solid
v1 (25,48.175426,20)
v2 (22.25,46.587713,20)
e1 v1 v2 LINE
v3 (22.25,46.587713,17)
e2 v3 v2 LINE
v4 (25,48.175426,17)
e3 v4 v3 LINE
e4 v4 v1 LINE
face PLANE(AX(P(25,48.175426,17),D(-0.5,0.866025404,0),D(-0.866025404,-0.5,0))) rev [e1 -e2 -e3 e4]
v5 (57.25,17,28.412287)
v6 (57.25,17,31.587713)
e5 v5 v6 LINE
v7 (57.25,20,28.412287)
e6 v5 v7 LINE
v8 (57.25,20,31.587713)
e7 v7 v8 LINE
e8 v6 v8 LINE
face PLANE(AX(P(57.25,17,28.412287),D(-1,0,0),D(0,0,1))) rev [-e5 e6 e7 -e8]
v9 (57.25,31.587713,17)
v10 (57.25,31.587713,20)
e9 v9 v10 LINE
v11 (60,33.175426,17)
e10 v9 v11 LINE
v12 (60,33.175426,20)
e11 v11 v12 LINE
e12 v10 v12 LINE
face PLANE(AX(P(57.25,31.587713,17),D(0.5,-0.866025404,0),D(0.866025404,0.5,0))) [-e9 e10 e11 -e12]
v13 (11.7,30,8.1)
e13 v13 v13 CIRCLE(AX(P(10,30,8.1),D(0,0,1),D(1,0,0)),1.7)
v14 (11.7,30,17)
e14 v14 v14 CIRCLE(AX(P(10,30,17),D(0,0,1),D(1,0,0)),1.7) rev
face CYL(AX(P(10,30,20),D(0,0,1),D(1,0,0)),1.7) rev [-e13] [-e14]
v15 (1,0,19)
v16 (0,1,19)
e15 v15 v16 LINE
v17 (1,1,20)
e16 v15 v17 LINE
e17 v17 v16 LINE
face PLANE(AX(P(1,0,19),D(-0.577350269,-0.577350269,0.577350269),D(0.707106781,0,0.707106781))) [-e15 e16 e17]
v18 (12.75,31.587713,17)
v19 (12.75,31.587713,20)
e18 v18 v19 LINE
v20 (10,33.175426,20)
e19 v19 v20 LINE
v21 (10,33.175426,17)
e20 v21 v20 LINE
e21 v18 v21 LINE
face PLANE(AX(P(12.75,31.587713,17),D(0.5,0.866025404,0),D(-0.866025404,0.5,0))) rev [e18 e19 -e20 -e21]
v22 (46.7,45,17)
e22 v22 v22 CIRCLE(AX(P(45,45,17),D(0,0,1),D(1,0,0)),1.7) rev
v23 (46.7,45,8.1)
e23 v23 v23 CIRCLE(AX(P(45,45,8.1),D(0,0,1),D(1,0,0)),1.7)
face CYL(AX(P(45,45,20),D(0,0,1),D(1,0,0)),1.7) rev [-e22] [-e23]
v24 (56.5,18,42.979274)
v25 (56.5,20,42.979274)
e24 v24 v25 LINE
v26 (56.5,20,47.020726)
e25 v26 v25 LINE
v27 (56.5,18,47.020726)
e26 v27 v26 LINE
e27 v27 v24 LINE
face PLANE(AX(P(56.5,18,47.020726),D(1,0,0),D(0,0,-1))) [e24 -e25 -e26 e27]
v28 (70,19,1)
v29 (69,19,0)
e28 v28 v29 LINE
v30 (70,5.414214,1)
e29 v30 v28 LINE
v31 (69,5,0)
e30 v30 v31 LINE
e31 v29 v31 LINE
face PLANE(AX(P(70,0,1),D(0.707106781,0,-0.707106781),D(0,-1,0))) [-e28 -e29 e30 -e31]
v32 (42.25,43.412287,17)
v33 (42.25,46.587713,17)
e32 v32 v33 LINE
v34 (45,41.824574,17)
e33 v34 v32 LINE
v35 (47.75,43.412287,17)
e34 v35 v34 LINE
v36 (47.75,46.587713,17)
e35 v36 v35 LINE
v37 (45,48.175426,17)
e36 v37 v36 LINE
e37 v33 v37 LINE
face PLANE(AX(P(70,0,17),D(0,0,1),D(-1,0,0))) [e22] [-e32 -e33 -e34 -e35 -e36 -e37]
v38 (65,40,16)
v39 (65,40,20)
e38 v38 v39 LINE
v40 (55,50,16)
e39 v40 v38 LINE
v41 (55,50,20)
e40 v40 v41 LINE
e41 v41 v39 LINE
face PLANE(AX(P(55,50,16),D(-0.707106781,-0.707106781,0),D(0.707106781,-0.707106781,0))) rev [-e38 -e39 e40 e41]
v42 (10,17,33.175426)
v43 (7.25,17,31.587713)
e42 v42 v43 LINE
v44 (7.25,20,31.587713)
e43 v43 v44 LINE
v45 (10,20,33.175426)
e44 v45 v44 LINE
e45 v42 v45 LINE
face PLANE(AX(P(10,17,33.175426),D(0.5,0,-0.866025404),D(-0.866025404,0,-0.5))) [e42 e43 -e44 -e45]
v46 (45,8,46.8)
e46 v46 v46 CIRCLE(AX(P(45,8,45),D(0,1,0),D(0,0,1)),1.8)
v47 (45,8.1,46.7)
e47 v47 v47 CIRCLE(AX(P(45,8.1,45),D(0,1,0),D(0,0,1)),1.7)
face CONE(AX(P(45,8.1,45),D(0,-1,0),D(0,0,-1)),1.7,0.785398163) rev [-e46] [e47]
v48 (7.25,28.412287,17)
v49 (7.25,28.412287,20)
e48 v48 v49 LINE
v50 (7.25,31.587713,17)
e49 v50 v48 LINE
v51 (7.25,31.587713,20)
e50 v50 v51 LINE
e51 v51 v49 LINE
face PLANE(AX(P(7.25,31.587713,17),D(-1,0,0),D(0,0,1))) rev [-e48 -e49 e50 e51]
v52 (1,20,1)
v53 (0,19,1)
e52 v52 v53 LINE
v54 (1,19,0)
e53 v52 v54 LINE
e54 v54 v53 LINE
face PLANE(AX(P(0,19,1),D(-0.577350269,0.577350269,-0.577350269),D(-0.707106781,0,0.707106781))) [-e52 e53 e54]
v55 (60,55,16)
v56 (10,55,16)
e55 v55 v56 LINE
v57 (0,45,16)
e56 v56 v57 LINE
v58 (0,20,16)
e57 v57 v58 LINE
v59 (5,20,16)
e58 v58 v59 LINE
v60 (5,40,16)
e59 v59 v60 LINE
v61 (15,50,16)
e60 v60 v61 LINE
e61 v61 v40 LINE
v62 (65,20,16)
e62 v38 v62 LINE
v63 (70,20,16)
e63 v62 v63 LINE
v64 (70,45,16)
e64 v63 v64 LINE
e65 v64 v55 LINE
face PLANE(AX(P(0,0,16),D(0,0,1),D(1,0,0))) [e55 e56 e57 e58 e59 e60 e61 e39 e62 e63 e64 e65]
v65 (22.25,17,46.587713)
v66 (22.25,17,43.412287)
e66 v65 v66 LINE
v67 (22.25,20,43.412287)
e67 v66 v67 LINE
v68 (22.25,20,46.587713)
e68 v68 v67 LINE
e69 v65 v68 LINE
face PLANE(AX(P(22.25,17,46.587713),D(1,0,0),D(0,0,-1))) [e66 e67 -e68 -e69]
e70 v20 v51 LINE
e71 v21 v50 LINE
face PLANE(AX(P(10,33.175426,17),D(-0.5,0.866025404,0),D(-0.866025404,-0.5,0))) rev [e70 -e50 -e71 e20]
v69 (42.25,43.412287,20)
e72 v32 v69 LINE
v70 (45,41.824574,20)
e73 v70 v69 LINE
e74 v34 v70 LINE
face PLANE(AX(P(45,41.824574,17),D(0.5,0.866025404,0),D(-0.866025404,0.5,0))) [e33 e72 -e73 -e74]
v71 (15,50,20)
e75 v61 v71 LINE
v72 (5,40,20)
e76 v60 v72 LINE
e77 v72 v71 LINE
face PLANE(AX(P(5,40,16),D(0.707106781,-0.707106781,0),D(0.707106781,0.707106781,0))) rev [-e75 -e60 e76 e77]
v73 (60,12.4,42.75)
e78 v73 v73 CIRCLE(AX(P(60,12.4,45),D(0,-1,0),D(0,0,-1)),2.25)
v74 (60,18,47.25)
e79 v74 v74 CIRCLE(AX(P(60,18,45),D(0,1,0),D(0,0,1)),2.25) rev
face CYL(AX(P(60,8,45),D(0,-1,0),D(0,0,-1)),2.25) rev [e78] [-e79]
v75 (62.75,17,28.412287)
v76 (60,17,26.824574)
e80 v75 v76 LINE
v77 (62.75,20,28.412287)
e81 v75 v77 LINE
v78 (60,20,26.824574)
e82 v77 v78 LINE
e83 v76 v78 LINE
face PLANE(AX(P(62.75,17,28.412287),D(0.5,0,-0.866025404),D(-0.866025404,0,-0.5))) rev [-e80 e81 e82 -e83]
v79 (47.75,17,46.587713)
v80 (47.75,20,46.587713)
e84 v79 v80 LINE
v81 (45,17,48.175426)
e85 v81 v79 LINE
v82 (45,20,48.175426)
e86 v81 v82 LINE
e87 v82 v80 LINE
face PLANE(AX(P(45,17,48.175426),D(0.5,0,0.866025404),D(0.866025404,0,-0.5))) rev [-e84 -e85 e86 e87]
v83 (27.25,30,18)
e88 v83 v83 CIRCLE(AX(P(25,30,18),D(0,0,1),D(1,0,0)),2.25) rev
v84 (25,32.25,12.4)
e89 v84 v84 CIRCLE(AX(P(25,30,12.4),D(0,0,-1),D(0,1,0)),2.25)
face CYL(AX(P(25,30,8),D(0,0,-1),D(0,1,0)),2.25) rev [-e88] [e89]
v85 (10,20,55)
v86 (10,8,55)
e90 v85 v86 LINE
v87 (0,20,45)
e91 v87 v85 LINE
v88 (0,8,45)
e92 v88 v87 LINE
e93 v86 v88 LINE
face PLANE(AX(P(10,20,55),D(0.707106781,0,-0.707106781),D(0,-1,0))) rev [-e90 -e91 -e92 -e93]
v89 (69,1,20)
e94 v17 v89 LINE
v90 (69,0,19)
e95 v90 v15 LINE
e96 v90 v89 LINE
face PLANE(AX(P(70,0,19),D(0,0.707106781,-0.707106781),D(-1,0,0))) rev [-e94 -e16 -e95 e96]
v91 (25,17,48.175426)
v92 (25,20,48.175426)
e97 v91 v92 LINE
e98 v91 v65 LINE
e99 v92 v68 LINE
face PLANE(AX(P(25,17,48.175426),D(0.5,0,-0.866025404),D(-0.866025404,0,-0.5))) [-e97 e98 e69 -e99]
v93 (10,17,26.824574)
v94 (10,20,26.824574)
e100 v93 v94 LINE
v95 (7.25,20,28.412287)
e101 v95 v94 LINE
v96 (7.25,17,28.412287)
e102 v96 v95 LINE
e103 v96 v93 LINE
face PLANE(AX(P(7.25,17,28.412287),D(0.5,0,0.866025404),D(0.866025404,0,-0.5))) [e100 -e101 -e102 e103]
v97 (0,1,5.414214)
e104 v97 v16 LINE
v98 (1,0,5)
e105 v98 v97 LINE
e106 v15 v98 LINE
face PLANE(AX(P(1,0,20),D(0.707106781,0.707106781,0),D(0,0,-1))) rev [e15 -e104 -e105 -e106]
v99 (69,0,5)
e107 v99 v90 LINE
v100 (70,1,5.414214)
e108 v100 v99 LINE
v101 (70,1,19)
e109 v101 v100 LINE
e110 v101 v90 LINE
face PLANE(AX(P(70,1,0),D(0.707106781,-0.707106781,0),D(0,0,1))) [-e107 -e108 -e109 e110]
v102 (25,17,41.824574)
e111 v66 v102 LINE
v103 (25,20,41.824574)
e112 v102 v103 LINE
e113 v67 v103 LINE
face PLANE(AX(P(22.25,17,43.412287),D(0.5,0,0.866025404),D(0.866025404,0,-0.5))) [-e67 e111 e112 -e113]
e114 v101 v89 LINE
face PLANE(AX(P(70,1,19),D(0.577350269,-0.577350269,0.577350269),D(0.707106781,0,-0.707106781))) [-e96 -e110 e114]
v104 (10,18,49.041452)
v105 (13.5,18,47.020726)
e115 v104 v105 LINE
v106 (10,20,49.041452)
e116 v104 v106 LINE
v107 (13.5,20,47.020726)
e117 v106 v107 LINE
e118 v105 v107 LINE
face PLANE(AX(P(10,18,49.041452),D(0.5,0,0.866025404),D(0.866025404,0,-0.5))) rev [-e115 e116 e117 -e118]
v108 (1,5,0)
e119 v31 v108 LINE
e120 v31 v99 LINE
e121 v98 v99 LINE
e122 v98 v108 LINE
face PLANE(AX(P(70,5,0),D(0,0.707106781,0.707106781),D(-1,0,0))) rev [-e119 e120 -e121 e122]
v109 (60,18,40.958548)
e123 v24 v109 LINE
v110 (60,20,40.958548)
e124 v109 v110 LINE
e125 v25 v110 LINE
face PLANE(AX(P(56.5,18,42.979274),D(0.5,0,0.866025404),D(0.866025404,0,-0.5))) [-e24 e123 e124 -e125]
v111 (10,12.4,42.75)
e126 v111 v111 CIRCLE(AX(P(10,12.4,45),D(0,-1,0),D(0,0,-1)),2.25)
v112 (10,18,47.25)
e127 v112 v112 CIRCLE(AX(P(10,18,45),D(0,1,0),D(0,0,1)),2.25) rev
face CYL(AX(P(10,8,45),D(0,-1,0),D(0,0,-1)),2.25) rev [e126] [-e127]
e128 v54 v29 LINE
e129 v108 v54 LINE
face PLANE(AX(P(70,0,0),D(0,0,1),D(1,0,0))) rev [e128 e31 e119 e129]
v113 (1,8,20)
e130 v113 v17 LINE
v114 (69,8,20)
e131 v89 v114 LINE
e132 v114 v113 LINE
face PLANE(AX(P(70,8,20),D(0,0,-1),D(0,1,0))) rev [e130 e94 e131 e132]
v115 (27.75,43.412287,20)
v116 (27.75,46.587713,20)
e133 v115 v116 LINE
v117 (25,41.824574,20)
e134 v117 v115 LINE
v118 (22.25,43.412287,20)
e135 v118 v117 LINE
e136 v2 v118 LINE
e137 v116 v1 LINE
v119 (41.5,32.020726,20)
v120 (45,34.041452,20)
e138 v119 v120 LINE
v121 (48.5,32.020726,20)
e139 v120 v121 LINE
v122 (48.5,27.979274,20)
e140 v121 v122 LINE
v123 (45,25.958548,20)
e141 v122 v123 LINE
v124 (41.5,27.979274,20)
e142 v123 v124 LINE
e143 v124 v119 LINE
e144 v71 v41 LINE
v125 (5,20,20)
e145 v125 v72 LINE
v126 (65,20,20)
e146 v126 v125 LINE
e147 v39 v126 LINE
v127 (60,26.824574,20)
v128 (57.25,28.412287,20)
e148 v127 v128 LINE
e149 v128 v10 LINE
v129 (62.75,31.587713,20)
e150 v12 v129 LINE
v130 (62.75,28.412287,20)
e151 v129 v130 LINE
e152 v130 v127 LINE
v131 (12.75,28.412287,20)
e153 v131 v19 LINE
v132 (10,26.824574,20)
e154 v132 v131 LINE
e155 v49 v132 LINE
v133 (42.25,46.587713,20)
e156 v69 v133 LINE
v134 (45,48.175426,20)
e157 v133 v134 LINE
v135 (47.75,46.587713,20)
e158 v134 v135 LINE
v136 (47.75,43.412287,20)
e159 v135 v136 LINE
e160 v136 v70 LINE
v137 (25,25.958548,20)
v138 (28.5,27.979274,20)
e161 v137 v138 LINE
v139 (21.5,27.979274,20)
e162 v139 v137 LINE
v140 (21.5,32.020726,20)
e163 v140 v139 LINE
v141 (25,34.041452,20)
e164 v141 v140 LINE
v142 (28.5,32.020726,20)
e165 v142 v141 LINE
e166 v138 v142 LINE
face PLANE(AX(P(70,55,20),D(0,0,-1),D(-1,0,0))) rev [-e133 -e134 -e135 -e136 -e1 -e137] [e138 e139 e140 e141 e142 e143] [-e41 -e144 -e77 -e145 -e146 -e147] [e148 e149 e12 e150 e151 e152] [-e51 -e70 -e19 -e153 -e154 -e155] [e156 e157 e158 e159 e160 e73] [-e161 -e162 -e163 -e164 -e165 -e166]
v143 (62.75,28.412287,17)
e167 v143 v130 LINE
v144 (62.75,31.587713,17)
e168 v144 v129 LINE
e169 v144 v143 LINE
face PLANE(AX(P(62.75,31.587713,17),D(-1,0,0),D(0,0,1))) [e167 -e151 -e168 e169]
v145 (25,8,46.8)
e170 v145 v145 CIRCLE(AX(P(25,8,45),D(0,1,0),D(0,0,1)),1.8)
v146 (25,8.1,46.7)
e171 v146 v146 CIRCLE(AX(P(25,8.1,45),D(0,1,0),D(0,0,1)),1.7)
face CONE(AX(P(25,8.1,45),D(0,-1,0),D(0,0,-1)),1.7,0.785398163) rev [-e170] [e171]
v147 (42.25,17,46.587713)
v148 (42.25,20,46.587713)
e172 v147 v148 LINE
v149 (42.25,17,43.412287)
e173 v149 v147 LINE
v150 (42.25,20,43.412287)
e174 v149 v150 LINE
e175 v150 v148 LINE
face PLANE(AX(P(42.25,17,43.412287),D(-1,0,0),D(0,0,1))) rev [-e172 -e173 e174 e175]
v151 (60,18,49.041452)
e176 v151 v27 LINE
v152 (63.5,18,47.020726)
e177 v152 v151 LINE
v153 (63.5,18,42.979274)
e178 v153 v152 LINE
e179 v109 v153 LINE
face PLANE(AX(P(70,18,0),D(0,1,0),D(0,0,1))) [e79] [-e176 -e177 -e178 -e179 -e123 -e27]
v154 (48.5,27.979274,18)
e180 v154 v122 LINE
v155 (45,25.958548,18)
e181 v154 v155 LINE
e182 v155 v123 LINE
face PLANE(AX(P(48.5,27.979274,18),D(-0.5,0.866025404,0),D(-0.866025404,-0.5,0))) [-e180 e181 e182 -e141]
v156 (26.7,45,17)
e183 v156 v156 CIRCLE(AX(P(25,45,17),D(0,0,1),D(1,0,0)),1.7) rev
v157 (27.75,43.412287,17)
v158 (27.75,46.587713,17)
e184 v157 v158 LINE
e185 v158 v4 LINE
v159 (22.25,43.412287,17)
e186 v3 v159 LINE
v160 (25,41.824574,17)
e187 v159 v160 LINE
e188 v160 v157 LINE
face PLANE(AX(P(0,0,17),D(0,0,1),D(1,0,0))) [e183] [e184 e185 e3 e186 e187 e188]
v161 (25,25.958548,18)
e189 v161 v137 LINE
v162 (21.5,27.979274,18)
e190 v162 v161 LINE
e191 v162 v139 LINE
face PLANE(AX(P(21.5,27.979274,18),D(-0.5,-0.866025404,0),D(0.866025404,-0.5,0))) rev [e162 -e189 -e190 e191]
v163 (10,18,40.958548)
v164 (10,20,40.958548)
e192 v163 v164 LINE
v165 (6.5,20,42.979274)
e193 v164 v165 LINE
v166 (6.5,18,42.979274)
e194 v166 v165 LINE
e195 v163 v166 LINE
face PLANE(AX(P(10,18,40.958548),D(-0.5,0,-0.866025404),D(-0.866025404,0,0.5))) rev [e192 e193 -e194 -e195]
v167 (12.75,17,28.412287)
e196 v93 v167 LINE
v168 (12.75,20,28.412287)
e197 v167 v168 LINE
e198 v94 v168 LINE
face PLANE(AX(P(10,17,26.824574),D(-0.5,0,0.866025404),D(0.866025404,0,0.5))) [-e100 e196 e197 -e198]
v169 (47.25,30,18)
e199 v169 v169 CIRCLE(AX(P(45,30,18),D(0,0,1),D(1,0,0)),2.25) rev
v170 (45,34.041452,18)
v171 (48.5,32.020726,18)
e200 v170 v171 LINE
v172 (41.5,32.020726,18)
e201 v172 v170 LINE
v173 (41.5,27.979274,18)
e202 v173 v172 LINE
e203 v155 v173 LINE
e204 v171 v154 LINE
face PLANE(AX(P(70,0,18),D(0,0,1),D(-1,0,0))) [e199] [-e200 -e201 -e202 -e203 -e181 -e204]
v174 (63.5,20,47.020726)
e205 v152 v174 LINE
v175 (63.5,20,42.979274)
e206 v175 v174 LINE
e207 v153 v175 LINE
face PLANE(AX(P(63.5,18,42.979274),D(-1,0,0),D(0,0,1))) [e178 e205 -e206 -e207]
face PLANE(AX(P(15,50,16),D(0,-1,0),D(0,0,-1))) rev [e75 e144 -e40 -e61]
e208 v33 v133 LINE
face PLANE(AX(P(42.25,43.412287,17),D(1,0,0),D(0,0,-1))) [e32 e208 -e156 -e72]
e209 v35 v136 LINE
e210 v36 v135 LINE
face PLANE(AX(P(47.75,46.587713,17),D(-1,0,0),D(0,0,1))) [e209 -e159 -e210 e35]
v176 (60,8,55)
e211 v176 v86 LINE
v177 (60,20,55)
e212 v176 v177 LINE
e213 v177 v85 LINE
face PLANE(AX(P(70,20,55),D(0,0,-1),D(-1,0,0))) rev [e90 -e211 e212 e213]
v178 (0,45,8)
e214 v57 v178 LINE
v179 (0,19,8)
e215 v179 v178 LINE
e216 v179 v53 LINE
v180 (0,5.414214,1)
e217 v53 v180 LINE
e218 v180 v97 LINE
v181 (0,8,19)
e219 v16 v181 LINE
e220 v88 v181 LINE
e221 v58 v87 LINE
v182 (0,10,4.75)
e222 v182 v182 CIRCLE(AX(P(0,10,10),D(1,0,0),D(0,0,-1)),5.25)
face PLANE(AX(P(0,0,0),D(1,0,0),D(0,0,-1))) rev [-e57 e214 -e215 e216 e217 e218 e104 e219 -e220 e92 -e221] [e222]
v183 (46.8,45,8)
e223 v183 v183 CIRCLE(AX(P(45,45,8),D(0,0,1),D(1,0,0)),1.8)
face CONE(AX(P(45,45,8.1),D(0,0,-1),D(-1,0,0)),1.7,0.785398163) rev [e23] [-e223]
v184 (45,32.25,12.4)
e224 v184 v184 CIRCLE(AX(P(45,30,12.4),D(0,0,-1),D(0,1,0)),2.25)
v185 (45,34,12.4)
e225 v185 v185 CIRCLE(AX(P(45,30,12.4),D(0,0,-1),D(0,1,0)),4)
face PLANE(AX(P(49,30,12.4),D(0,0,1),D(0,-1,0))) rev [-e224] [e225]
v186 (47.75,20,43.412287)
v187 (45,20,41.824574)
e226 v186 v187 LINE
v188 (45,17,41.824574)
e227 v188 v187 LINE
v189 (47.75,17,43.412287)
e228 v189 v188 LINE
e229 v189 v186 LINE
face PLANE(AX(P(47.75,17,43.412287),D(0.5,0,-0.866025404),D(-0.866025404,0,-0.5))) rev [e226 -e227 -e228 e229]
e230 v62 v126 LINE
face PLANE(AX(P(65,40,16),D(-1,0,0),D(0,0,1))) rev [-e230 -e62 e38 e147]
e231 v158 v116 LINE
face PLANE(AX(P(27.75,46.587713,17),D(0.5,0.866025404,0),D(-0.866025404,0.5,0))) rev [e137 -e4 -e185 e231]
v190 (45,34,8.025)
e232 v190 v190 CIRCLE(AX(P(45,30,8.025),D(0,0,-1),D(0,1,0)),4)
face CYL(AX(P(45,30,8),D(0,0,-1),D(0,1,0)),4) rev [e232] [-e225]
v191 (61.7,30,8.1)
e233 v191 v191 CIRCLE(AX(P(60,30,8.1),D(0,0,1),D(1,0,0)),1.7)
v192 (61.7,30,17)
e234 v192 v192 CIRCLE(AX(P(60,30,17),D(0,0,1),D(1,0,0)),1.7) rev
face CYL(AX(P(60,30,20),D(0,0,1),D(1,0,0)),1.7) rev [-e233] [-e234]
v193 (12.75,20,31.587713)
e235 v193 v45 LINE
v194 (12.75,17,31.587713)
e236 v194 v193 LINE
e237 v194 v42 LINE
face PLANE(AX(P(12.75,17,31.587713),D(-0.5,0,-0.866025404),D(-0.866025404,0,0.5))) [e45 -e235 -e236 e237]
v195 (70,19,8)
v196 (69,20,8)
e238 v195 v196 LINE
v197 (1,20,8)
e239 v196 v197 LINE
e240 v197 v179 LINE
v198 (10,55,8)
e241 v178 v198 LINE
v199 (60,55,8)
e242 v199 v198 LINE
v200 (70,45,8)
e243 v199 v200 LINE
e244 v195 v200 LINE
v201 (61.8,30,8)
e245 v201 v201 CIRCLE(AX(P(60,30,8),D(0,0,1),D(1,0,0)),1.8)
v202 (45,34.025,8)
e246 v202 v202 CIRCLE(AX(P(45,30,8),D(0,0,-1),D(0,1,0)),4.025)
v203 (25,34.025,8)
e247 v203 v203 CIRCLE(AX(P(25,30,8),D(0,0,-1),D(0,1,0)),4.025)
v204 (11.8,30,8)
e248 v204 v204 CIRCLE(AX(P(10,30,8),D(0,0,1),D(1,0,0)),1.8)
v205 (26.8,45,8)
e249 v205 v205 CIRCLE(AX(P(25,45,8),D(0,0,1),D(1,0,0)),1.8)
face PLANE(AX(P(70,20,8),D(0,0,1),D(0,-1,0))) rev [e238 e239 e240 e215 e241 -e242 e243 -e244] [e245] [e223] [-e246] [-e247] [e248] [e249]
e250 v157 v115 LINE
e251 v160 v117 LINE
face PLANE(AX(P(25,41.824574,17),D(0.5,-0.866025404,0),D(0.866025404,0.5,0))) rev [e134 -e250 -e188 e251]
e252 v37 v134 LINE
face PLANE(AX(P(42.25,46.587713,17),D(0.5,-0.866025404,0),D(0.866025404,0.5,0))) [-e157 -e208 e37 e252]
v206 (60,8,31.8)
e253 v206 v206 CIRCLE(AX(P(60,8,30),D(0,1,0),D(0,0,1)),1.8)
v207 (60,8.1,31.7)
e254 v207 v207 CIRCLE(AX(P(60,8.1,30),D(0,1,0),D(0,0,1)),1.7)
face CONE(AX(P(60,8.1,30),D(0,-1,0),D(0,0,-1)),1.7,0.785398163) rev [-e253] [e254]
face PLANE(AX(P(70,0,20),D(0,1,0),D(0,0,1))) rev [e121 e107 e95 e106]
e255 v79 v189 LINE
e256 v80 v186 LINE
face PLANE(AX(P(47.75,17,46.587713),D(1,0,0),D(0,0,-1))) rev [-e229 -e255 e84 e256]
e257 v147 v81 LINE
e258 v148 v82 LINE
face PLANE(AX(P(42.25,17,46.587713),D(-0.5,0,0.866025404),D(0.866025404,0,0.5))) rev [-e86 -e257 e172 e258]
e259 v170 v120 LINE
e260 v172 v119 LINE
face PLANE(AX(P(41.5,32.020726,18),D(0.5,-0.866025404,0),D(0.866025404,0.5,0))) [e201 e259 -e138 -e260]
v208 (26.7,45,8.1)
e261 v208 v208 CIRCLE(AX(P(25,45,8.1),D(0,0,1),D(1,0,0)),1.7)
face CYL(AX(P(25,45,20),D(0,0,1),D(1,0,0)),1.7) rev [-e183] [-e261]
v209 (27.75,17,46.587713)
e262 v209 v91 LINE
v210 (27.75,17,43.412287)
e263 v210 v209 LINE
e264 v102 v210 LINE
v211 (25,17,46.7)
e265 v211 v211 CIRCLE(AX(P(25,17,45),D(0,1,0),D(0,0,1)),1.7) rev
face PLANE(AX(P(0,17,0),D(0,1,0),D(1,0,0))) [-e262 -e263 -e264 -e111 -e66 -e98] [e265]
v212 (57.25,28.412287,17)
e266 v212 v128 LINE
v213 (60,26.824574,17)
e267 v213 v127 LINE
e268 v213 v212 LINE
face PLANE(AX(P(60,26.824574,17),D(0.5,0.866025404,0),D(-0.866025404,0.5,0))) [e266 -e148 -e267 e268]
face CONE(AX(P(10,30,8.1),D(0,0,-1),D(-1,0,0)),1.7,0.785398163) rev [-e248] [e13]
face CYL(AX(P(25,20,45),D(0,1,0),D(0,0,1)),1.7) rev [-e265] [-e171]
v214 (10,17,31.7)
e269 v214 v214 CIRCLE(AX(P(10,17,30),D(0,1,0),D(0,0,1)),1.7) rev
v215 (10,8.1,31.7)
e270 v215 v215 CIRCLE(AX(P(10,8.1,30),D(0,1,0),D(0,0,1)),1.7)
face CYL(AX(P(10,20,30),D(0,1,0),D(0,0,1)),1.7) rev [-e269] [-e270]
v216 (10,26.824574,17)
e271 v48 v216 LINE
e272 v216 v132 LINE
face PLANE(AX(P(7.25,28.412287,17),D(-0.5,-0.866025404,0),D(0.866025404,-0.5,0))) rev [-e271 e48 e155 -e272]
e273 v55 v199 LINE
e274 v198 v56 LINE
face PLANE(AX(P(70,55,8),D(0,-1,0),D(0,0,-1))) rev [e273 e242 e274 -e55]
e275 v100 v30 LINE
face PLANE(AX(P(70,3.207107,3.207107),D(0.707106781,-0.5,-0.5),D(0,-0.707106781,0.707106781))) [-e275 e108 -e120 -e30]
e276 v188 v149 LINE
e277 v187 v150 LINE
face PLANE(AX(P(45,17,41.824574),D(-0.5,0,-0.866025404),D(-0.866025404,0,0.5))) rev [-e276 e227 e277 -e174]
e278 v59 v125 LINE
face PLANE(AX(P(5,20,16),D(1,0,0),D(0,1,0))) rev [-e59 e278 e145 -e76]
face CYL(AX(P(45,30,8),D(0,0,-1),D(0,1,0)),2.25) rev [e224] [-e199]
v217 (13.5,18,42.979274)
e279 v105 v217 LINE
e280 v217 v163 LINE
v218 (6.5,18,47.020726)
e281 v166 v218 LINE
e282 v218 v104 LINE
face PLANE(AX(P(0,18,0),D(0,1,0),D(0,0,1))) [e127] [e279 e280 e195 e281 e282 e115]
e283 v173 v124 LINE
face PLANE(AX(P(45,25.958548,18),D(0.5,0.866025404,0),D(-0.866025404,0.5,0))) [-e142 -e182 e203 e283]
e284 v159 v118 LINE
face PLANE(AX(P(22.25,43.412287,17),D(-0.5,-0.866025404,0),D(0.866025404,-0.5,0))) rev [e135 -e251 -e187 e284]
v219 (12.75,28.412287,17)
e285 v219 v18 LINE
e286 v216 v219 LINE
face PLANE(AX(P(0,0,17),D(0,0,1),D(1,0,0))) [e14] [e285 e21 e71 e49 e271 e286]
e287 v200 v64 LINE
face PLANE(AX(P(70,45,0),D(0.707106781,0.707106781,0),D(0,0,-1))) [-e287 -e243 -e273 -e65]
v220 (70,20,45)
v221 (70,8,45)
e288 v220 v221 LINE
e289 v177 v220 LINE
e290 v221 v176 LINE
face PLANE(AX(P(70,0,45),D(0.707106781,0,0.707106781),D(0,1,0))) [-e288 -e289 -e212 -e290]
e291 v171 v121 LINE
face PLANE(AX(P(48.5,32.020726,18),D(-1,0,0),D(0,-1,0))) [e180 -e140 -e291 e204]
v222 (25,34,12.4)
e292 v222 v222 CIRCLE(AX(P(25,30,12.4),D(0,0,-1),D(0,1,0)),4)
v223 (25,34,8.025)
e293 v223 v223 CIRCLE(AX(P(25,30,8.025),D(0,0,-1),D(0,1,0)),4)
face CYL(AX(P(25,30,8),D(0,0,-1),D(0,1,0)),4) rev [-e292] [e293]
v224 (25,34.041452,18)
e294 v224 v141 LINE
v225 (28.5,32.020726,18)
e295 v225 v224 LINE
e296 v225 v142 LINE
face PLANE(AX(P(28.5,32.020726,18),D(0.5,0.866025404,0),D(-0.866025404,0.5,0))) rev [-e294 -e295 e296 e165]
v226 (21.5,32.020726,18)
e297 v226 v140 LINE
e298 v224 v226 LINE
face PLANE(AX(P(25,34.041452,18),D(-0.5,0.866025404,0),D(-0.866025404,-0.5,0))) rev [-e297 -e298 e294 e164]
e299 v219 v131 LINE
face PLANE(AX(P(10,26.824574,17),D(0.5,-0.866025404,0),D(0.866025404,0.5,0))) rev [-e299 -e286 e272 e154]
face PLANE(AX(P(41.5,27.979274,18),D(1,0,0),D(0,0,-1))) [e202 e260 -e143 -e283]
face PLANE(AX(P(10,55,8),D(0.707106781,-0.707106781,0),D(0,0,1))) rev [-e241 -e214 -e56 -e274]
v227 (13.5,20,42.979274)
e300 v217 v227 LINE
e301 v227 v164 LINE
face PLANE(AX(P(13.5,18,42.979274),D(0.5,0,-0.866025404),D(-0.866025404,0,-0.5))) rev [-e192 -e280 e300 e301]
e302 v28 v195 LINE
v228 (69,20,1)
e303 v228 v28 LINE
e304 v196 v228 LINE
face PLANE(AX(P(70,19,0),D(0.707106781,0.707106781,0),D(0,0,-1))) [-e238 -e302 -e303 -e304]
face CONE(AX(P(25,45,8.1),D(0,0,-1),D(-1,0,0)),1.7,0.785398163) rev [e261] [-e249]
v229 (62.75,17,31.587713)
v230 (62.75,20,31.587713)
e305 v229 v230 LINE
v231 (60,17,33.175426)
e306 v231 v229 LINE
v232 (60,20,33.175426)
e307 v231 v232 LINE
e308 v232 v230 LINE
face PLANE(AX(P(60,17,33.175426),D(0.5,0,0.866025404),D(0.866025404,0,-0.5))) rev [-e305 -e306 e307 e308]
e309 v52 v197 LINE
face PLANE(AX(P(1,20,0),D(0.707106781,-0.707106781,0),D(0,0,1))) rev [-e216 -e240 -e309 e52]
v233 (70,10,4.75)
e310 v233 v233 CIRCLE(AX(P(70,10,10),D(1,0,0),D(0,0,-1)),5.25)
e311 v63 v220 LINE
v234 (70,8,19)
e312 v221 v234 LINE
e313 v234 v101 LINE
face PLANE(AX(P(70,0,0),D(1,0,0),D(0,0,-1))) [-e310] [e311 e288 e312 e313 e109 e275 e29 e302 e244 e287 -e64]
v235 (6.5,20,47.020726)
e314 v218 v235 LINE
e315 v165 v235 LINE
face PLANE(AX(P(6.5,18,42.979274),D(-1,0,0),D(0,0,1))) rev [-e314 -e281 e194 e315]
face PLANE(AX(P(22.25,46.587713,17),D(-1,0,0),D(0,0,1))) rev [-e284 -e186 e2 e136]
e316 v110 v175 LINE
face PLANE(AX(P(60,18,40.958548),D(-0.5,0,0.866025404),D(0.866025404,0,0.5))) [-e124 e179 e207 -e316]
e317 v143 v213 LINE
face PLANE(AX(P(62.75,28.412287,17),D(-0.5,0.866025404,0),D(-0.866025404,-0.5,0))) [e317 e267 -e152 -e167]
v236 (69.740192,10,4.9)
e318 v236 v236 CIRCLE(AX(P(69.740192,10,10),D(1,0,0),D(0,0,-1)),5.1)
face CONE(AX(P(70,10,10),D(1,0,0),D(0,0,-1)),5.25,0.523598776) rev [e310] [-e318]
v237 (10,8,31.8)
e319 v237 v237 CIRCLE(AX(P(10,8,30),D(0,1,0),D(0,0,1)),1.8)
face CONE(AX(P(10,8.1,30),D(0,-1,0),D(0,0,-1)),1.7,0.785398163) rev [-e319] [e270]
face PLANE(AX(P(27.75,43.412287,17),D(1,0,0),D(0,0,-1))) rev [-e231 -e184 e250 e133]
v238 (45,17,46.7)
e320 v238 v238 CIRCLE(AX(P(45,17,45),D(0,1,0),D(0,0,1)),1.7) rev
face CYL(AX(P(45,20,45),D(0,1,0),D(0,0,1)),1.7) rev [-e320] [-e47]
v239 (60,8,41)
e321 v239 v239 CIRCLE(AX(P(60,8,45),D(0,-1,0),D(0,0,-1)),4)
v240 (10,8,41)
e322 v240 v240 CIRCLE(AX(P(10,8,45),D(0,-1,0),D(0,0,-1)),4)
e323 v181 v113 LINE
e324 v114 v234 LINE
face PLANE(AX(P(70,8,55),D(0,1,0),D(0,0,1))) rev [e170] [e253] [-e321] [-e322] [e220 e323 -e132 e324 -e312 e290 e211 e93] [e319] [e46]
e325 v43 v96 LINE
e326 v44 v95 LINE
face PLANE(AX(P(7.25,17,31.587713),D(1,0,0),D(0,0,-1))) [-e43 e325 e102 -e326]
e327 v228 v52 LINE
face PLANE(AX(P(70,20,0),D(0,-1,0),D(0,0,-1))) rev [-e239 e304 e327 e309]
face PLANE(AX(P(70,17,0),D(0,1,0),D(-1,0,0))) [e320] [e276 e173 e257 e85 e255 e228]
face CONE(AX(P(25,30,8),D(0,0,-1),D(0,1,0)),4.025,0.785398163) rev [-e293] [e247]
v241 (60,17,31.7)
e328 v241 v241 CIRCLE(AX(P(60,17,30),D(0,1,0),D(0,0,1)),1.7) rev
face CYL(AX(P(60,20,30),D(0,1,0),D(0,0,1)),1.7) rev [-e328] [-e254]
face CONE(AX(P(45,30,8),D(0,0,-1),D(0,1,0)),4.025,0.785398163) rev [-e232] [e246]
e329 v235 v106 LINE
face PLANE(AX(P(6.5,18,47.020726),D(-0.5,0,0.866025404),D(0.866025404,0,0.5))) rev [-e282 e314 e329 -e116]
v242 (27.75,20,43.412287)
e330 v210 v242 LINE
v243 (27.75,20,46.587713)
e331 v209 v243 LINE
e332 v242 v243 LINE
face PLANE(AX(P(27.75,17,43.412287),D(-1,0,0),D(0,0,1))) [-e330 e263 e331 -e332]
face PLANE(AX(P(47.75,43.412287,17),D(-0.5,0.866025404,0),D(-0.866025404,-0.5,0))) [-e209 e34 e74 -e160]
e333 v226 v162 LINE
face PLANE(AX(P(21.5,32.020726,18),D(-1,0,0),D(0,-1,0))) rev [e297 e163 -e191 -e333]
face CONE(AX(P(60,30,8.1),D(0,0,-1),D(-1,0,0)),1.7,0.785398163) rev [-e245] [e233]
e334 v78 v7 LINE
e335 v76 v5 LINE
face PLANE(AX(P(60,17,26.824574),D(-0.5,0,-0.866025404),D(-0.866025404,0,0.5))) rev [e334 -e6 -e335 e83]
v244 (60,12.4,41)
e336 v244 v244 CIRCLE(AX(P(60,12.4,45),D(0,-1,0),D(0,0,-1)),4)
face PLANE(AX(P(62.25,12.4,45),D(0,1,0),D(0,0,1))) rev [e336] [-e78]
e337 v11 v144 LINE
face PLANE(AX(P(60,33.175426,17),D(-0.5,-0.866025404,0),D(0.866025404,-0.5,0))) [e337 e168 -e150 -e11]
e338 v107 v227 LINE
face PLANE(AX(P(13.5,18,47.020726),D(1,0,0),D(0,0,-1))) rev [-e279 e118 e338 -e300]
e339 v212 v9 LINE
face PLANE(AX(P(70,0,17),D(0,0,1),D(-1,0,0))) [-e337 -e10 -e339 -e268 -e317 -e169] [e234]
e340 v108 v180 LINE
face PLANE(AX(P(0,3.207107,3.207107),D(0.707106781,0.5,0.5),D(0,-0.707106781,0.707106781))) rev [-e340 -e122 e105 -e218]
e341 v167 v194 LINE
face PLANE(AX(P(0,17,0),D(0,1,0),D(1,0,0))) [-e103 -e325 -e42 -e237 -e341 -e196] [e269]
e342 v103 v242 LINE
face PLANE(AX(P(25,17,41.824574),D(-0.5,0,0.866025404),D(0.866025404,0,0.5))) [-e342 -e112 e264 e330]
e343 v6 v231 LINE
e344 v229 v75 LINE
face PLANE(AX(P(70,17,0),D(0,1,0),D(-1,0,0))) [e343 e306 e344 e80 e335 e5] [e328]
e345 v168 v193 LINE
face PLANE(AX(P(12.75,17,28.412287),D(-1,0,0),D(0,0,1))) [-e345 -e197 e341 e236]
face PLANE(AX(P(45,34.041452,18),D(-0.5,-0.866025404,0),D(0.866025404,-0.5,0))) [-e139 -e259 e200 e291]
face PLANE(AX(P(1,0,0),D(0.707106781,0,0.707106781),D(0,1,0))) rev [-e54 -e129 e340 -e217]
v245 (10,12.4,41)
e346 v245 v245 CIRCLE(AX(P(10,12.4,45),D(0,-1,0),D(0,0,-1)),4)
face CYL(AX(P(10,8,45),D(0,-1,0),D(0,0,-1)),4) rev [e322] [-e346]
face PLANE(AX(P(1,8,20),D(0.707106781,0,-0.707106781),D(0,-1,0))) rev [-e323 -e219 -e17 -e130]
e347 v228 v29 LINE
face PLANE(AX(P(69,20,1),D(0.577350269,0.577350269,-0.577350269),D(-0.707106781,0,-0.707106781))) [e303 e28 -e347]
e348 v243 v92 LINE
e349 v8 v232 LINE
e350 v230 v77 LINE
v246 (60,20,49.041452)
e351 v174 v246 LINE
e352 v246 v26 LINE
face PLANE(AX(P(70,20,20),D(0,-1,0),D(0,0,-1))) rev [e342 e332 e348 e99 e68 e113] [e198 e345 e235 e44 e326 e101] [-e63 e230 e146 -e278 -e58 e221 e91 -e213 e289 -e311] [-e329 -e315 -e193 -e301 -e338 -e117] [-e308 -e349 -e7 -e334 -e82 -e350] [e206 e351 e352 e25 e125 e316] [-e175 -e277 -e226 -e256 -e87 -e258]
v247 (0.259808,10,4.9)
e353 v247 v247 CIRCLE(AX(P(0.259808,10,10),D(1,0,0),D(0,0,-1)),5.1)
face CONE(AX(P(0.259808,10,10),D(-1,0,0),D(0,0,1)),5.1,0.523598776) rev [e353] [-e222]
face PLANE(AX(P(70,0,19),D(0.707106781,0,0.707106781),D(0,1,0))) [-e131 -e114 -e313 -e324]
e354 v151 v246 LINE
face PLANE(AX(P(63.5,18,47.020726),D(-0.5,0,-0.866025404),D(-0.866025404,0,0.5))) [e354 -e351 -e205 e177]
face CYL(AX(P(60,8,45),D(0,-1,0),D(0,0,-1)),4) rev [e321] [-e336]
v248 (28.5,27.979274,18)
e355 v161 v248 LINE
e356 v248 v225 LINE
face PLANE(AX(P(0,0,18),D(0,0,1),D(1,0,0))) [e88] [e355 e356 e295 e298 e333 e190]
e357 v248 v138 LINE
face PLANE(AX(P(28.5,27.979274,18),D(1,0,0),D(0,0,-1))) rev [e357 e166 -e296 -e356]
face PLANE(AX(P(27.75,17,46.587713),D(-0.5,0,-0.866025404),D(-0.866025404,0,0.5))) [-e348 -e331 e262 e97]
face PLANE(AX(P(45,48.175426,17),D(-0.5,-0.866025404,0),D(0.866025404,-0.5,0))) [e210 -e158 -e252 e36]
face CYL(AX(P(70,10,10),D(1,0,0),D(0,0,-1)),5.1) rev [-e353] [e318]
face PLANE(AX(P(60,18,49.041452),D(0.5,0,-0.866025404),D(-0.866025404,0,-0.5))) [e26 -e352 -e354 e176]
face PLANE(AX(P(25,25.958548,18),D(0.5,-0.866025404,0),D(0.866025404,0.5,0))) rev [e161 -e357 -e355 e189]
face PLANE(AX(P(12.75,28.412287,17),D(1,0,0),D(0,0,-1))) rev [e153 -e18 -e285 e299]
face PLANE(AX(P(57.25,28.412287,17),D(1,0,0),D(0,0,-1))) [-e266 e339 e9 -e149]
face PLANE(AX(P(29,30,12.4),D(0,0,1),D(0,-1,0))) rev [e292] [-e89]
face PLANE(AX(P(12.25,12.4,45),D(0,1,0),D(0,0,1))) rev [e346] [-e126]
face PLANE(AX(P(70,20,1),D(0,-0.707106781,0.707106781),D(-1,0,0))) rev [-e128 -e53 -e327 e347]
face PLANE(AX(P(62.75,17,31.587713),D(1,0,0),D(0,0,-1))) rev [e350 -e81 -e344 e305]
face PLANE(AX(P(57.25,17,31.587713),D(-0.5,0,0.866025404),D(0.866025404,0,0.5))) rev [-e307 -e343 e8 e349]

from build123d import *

# Parameters (mm, degrees)
BODY_DEPTH                             = 70
FRONTAL_M3_NUT_CUTOUTS_DEPTH           = 3
FRONTAL_M4_NUT_CUTOUT_DEPTH            = 2
MAIN_CHAMFER_SIZE                      = 5
SIDE_CHAMFER_SIZE                      = 1
WALL_CHAMFERS_SIZE                     = 10
CLEARANCE_CUTOUT_DEPTH                 = 4
M3_FULL_MIRROR_COPY_3_DEPTH            = 3
BOTTOM_BOARD_MOUNTING_HOLE_D           = 4.5
BOTTOM_BOARD_MOUNTING_HOLE_CBORE_D     = 8
BOTTOM_BOARD_MOUNTING_HOLE_CBORE_DEPTH = 4.4
BOTTOM_M4_NUT_CUTOUT_DEPTH             = 2


# Read off the part's stored shape, not the designer's step: hull_mounting_holes
with BuildPart() as part:
    # body_sketch → body (new body)
    with BuildSketch(Plane(origin=(0, 0, 0), x_dir=(0, 0, -1), z_dir=(1, 0, 0))):
        Polygon((0, 0), (0, 20), (-8, 20), (-8, 55), (-20, 55), (-20, 20), (-55, 20), (-55, 8), (-20, 8), (-20, 0), align=None)
    extrude(amount=BODY_DEPTH)

    # rod_hole_sketch_auto → rod_hole_d10 (revolve, cut)
    with BuildSketch(Plane(origin=(70, 10, 10), x_dir=(0, 0, -1), z_dir=(0, 1, 0))):
        Polygon((0, 0), (0, 70), (5.25, 70), (5.1, 69.740192379), (5.1, 0.259807621), (5.25, 0), align=None)
    revolve(axis=Axis((76.35, 10, 10), (-1, 0, 0)), mode=Mode.SUBTRACT)

    # hull_mounting_holes outline → hull_mounting_holes (revolve, cut)
    with BuildSketch(Plane(origin=(25, 45, 0), x_dir=(1, 0, 0), z_dir=(0, -1, 0))):
        Polygon((0, 8), (1.8, 8), (1.7, 8.1), (1.7, 19.9), (1.8, 20), (0, 20), align=None)
    hull_mounting_holes = revolve(axis=Axis((25, 45, 0), (0, 0, 1)), mode=Mode.SUBTRACT)

    # hull_mounting_holes 2 outline → hull_mounting_holes 2 (revolve, cut)
    with BuildSketch(Plane(origin=(10, 30, 0), x_dir=(1, 0, 0), z_dir=(0, -1, 0))):
        Polygon((0, 8), (1.8, 8), (1.7, 8.1), (1.7, 19.9), (1.8, 20), (0, 20), align=None)
    hull_mounting_holes_2 = revolve(axis=Axis((10, 30, 0), (0, 0, 1)), mode=Mode.SUBTRACT)

    # Sketch8 → board_mounting_hole (revolve, cut)
    with BuildSketch(Plane(origin=(25, 30, 8), x_dir=(0, 1, 0), z_dir=(1, 0, 0))):
        Polygon((0, 0), (0, 12), (2.275, 12), (2.25, 11.975), (2.25, 4.4), (4, 4.4), (4, 0.025), (4.025, 0), align=None)
    board_mounting_hole = revolve(axis=Axis((25, 30, 1.65), (0, 0, 1)), mode=Mode.SUBTRACT)

    # Sketch9 → frontal_m3_nut_cutouts (cut)
    with BuildSketch(Plane.XY.offset(20)):
        Polygon((25, 48.175426481), (22.25, 46.58771324), (22.25, 43.41228676), (25, 41.824573519), (27.75, 43.41228676), (27.75, 46.58771324), align=None)
        Polygon((10, 33.175426481), (7.25, 31.58771324), (7.25, 28.41228676), (10, 26.824573519), (12.75, 28.41228676), (12.75, 31.58771324), align=None)
    frontal_m3_nut_cutouts = extrude(amount=-FRONTAL_M3_NUT_CUTOUTS_DEPTH, mode=Mode.SUBTRACT)

    # Sketch10 → frontal_m4_nut_cutout (cut)
    with BuildSketch(Plane.XY.offset(20)):
        Polygon((21.5, 32.020725942), (21.5, 27.979274058), (25, 25.958548116), (28.5, 27.979274058), (28.5, 32.020725942), (25, 34.041451884), align=None)
    frontal_m4_nut_cutout = extrude(amount=-FRONTAL_M4_NUT_CUTOUT_DEPTH, mode=Mode.SUBTRACT)

    # frontal_m4_mirror: board_mounting_hole, frontal_m4_nut_cutout across plane
    add(board_mounting_hole.mirror(Plane.ZY.offset(-35)), mode=Mode.SUBTRACT)
    add(frontal_m4_nut_cutout.mirror(Plane.ZY.offset(-35)), mode=Mode.SUBTRACT)

    # main_chamfer
    main_chamfer_edges = [part.edges().sort_by_distance(p)[0] for p in [
        (35, 0, 0),
    ]]
    chamfer(main_chamfer_edges, length=MAIN_CHAMFER_SIZE)

    # side_chamfer
    side_chamfer_edges = [part.edges().sort_by_distance(p)[0] for p in [
        (0, 4, 20),
        (70, 20, 4),
        (0, 20, 4),
        (0, 0, 12.5),
        (0, 12.5, 0),
        (70, 12.5, 0),
        (0, 2.5, 2.5),
        (70, 2.5, 2.5),
        (35, 0, 20),
        (35, 20, 0),
        (70, 4, 20),
        (70, 0, 12.5),
    ]]
    chamfer(side_chamfer_edges, length=SIDE_CHAMFER_SIZE)

    # wall_chamfers
    wall_chamfers_edges = [part.edges().sort_by_distance(p)[0] for p in [
        (0, 14, 55),
        (0, 55, 14),
        (70, 55, 14),
        (70, 14, 55),
    ]]
    chamfer(wall_chamfers_edges, length=WALL_CHAMFERS_SIZE)

    # Sketch11 → clearance_cutout (cut)
    with BuildSketch(Plane.XY.offset(20)):
        Polygon((0, 20), (5, 20), (5, 40), (15, 50), (55, 50), (65, 40), (65, 20), (70, 20), (70, 45), (60, 55), (10, 55), (0, 45), align=None)
    extrude(amount=-CLEARANCE_CUTOUT_DEPTH, mode=Mode.SUBTRACT)

    # bottom_m3_mirror: hull_mounting_holes, hull_mounting_holes 2, frontal_m3_nut_cutouts across plane
    add(hull_mounting_holes.mirror(Plane(origin=(0, 0, 0), x_dir=(0, 0.7071067811865476, 0.7071067811865475), z_dir=(0, 0.7071067811865475, -0.7071067811865476))), mode=Mode.SUBTRACT)
    add(hull_mounting_holes_2.mirror(Plane(origin=(0, 0, 0), x_dir=(0, 0.7071067811865476, 0.7071067811865475), z_dir=(0, 0.7071067811865475, -0.7071067811865476))), mode=Mode.SUBTRACT)
    add(frontal_m3_nut_cutouts.mirror(Plane(origin=(0, 0, 0), x_dir=(0, 0.7071067811865476, 0.7071067811865475), z_dir=(0, 0.7071067811865475, -0.7071067811865476))), mode=Mode.SUBTRACT)

    # m3_full_mirror: hull_mounting_holes, hull_mounting_holes 2, frontal_m3_nut_cutouts across plane
    add(hull_mounting_holes.mirror(Plane.ZY.offset(-35)), mode=Mode.SUBTRACT)
    add(hull_mounting_holes_2.mirror(Plane.ZY.offset(-35)), mode=Mode.SUBTRACT)
    add(frontal_m3_nut_cutouts.mirror(Plane.ZY.offset(-35)), mode=Mode.SUBTRACT)

    # m3_full_mirror copy 1 sketch → m3_full_mirror copy 1 (revolve, cut)
    with BuildSketch(Plane(origin=(45, 0, 45), x_dir=(-1, 0, 0), z_dir=(0, 0, -1))):
        Polygon((0, 8), (1.8, 8), (1.7, 8.1), (1.7, 19.9), (1.8, 20), (0, 20), align=None)
    revolve(axis=Axis((45, 0, 45), (0, 1, 0)), mode=Mode.SUBTRACT)

    # m3_full_mirror copy 2 sketch → m3_full_mirror copy 2 (revolve, cut)
    with BuildSketch(Plane(origin=(60, 0, 30), x_dir=(-1, 0, 0), z_dir=(0, 0, -1))):
        Polygon((0, 8), (1.8, 8), (1.7, 8.1), (1.7, 19.9), (1.8, 20), (0, 20), align=None)
    revolve(axis=Axis((60, 0, 30), (0, 1, 0)), mode=Mode.SUBTRACT)

    # m3_full_mirror copy 3 sketch → m3_full_mirror copy 3 (cut)
    with BuildSketch(Plane(origin=(70, 20, 0), x_dir=(-1, 0, 0), z_dir=(0, 1, 0))):
        Polygon((25, 48.175426481), (22.25, 46.58771324), (22.25, 43.41228676), (25, 41.824573519), (27.75, 43.41228676), (27.75, 46.58771324), align=None)
        Polygon((10, 33.175426481), (7.25, 31.58771324), (7.25, 28.41228676), (10, 26.824573519), (12.75, 28.41228676), (12.75, 31.58771324), align=None)
    extrude(amount=-M3_FULL_MIRROR_COPY_3_DEPTH, mode=Mode.SUBTRACT)

    # m3_full_mirror copy 4 sketch → m3_full_mirror copy 4 (revolve, cut)
    with BuildSketch(Plane(origin=(60, 30, 0), x_dir=(-1, 0, 0), z_dir=(0, -1, 0))):
        Polygon((0, -8), (1.8, -8), (1.7, -8.1), (1.7, -19.9), (1.8, -20), (0, -20), align=None)
    revolve(axis=Axis((60, 30, 0), (0, 0, -1)), mode=Mode.SUBTRACT)

    # bottom_board_mounting_hole (through all)
    with Locations(Plane.XZ.offset(-8)):
        with Locations((10, 45)):
            bottom_board_mounting_hole = CounterBoreHole(BOTTOM_BOARD_MOUNTING_HOLE_D / 2, BOTTOM_BOARD_MOUNTING_HOLE_CBORE_D / 2, BOTTOM_BOARD_MOUNTING_HOLE_CBORE_DEPTH)

    # Sketch15 → bottom_m4_nut_cutout (cut)
    with BuildSketch(Plane(origin=(0, 20, 0), x_dir=(1, 0, 0), z_dir=(0, 1, 0))):
        Polygon((10, -40.958548116), (6.5, -42.979274058), (6.5, -47.020725942), (10, -49.041451884), (13.5, -47.020725942), (13.5, -42.979274058), align=None)
    bottom_m4_nut_cutout = extrude(amount=-BOTTOM_M4_NUT_CUTOUT_DEPTH, mode=Mode.SUBTRACT)

    # bottom_m4_mirror: bottom_board_mounting_hole, bottom_m4_nut_cutout across plane
    add(bottom_board_mounting_hole.mirror(Plane.ZY.offset(-35)), mode=Mode.SUBTRACT)
    add(bottom_m4_nut_cutout.mirror(Plane.ZY.offset(-35)), mode=Mode.SUBTRACT)


solid = part.part
